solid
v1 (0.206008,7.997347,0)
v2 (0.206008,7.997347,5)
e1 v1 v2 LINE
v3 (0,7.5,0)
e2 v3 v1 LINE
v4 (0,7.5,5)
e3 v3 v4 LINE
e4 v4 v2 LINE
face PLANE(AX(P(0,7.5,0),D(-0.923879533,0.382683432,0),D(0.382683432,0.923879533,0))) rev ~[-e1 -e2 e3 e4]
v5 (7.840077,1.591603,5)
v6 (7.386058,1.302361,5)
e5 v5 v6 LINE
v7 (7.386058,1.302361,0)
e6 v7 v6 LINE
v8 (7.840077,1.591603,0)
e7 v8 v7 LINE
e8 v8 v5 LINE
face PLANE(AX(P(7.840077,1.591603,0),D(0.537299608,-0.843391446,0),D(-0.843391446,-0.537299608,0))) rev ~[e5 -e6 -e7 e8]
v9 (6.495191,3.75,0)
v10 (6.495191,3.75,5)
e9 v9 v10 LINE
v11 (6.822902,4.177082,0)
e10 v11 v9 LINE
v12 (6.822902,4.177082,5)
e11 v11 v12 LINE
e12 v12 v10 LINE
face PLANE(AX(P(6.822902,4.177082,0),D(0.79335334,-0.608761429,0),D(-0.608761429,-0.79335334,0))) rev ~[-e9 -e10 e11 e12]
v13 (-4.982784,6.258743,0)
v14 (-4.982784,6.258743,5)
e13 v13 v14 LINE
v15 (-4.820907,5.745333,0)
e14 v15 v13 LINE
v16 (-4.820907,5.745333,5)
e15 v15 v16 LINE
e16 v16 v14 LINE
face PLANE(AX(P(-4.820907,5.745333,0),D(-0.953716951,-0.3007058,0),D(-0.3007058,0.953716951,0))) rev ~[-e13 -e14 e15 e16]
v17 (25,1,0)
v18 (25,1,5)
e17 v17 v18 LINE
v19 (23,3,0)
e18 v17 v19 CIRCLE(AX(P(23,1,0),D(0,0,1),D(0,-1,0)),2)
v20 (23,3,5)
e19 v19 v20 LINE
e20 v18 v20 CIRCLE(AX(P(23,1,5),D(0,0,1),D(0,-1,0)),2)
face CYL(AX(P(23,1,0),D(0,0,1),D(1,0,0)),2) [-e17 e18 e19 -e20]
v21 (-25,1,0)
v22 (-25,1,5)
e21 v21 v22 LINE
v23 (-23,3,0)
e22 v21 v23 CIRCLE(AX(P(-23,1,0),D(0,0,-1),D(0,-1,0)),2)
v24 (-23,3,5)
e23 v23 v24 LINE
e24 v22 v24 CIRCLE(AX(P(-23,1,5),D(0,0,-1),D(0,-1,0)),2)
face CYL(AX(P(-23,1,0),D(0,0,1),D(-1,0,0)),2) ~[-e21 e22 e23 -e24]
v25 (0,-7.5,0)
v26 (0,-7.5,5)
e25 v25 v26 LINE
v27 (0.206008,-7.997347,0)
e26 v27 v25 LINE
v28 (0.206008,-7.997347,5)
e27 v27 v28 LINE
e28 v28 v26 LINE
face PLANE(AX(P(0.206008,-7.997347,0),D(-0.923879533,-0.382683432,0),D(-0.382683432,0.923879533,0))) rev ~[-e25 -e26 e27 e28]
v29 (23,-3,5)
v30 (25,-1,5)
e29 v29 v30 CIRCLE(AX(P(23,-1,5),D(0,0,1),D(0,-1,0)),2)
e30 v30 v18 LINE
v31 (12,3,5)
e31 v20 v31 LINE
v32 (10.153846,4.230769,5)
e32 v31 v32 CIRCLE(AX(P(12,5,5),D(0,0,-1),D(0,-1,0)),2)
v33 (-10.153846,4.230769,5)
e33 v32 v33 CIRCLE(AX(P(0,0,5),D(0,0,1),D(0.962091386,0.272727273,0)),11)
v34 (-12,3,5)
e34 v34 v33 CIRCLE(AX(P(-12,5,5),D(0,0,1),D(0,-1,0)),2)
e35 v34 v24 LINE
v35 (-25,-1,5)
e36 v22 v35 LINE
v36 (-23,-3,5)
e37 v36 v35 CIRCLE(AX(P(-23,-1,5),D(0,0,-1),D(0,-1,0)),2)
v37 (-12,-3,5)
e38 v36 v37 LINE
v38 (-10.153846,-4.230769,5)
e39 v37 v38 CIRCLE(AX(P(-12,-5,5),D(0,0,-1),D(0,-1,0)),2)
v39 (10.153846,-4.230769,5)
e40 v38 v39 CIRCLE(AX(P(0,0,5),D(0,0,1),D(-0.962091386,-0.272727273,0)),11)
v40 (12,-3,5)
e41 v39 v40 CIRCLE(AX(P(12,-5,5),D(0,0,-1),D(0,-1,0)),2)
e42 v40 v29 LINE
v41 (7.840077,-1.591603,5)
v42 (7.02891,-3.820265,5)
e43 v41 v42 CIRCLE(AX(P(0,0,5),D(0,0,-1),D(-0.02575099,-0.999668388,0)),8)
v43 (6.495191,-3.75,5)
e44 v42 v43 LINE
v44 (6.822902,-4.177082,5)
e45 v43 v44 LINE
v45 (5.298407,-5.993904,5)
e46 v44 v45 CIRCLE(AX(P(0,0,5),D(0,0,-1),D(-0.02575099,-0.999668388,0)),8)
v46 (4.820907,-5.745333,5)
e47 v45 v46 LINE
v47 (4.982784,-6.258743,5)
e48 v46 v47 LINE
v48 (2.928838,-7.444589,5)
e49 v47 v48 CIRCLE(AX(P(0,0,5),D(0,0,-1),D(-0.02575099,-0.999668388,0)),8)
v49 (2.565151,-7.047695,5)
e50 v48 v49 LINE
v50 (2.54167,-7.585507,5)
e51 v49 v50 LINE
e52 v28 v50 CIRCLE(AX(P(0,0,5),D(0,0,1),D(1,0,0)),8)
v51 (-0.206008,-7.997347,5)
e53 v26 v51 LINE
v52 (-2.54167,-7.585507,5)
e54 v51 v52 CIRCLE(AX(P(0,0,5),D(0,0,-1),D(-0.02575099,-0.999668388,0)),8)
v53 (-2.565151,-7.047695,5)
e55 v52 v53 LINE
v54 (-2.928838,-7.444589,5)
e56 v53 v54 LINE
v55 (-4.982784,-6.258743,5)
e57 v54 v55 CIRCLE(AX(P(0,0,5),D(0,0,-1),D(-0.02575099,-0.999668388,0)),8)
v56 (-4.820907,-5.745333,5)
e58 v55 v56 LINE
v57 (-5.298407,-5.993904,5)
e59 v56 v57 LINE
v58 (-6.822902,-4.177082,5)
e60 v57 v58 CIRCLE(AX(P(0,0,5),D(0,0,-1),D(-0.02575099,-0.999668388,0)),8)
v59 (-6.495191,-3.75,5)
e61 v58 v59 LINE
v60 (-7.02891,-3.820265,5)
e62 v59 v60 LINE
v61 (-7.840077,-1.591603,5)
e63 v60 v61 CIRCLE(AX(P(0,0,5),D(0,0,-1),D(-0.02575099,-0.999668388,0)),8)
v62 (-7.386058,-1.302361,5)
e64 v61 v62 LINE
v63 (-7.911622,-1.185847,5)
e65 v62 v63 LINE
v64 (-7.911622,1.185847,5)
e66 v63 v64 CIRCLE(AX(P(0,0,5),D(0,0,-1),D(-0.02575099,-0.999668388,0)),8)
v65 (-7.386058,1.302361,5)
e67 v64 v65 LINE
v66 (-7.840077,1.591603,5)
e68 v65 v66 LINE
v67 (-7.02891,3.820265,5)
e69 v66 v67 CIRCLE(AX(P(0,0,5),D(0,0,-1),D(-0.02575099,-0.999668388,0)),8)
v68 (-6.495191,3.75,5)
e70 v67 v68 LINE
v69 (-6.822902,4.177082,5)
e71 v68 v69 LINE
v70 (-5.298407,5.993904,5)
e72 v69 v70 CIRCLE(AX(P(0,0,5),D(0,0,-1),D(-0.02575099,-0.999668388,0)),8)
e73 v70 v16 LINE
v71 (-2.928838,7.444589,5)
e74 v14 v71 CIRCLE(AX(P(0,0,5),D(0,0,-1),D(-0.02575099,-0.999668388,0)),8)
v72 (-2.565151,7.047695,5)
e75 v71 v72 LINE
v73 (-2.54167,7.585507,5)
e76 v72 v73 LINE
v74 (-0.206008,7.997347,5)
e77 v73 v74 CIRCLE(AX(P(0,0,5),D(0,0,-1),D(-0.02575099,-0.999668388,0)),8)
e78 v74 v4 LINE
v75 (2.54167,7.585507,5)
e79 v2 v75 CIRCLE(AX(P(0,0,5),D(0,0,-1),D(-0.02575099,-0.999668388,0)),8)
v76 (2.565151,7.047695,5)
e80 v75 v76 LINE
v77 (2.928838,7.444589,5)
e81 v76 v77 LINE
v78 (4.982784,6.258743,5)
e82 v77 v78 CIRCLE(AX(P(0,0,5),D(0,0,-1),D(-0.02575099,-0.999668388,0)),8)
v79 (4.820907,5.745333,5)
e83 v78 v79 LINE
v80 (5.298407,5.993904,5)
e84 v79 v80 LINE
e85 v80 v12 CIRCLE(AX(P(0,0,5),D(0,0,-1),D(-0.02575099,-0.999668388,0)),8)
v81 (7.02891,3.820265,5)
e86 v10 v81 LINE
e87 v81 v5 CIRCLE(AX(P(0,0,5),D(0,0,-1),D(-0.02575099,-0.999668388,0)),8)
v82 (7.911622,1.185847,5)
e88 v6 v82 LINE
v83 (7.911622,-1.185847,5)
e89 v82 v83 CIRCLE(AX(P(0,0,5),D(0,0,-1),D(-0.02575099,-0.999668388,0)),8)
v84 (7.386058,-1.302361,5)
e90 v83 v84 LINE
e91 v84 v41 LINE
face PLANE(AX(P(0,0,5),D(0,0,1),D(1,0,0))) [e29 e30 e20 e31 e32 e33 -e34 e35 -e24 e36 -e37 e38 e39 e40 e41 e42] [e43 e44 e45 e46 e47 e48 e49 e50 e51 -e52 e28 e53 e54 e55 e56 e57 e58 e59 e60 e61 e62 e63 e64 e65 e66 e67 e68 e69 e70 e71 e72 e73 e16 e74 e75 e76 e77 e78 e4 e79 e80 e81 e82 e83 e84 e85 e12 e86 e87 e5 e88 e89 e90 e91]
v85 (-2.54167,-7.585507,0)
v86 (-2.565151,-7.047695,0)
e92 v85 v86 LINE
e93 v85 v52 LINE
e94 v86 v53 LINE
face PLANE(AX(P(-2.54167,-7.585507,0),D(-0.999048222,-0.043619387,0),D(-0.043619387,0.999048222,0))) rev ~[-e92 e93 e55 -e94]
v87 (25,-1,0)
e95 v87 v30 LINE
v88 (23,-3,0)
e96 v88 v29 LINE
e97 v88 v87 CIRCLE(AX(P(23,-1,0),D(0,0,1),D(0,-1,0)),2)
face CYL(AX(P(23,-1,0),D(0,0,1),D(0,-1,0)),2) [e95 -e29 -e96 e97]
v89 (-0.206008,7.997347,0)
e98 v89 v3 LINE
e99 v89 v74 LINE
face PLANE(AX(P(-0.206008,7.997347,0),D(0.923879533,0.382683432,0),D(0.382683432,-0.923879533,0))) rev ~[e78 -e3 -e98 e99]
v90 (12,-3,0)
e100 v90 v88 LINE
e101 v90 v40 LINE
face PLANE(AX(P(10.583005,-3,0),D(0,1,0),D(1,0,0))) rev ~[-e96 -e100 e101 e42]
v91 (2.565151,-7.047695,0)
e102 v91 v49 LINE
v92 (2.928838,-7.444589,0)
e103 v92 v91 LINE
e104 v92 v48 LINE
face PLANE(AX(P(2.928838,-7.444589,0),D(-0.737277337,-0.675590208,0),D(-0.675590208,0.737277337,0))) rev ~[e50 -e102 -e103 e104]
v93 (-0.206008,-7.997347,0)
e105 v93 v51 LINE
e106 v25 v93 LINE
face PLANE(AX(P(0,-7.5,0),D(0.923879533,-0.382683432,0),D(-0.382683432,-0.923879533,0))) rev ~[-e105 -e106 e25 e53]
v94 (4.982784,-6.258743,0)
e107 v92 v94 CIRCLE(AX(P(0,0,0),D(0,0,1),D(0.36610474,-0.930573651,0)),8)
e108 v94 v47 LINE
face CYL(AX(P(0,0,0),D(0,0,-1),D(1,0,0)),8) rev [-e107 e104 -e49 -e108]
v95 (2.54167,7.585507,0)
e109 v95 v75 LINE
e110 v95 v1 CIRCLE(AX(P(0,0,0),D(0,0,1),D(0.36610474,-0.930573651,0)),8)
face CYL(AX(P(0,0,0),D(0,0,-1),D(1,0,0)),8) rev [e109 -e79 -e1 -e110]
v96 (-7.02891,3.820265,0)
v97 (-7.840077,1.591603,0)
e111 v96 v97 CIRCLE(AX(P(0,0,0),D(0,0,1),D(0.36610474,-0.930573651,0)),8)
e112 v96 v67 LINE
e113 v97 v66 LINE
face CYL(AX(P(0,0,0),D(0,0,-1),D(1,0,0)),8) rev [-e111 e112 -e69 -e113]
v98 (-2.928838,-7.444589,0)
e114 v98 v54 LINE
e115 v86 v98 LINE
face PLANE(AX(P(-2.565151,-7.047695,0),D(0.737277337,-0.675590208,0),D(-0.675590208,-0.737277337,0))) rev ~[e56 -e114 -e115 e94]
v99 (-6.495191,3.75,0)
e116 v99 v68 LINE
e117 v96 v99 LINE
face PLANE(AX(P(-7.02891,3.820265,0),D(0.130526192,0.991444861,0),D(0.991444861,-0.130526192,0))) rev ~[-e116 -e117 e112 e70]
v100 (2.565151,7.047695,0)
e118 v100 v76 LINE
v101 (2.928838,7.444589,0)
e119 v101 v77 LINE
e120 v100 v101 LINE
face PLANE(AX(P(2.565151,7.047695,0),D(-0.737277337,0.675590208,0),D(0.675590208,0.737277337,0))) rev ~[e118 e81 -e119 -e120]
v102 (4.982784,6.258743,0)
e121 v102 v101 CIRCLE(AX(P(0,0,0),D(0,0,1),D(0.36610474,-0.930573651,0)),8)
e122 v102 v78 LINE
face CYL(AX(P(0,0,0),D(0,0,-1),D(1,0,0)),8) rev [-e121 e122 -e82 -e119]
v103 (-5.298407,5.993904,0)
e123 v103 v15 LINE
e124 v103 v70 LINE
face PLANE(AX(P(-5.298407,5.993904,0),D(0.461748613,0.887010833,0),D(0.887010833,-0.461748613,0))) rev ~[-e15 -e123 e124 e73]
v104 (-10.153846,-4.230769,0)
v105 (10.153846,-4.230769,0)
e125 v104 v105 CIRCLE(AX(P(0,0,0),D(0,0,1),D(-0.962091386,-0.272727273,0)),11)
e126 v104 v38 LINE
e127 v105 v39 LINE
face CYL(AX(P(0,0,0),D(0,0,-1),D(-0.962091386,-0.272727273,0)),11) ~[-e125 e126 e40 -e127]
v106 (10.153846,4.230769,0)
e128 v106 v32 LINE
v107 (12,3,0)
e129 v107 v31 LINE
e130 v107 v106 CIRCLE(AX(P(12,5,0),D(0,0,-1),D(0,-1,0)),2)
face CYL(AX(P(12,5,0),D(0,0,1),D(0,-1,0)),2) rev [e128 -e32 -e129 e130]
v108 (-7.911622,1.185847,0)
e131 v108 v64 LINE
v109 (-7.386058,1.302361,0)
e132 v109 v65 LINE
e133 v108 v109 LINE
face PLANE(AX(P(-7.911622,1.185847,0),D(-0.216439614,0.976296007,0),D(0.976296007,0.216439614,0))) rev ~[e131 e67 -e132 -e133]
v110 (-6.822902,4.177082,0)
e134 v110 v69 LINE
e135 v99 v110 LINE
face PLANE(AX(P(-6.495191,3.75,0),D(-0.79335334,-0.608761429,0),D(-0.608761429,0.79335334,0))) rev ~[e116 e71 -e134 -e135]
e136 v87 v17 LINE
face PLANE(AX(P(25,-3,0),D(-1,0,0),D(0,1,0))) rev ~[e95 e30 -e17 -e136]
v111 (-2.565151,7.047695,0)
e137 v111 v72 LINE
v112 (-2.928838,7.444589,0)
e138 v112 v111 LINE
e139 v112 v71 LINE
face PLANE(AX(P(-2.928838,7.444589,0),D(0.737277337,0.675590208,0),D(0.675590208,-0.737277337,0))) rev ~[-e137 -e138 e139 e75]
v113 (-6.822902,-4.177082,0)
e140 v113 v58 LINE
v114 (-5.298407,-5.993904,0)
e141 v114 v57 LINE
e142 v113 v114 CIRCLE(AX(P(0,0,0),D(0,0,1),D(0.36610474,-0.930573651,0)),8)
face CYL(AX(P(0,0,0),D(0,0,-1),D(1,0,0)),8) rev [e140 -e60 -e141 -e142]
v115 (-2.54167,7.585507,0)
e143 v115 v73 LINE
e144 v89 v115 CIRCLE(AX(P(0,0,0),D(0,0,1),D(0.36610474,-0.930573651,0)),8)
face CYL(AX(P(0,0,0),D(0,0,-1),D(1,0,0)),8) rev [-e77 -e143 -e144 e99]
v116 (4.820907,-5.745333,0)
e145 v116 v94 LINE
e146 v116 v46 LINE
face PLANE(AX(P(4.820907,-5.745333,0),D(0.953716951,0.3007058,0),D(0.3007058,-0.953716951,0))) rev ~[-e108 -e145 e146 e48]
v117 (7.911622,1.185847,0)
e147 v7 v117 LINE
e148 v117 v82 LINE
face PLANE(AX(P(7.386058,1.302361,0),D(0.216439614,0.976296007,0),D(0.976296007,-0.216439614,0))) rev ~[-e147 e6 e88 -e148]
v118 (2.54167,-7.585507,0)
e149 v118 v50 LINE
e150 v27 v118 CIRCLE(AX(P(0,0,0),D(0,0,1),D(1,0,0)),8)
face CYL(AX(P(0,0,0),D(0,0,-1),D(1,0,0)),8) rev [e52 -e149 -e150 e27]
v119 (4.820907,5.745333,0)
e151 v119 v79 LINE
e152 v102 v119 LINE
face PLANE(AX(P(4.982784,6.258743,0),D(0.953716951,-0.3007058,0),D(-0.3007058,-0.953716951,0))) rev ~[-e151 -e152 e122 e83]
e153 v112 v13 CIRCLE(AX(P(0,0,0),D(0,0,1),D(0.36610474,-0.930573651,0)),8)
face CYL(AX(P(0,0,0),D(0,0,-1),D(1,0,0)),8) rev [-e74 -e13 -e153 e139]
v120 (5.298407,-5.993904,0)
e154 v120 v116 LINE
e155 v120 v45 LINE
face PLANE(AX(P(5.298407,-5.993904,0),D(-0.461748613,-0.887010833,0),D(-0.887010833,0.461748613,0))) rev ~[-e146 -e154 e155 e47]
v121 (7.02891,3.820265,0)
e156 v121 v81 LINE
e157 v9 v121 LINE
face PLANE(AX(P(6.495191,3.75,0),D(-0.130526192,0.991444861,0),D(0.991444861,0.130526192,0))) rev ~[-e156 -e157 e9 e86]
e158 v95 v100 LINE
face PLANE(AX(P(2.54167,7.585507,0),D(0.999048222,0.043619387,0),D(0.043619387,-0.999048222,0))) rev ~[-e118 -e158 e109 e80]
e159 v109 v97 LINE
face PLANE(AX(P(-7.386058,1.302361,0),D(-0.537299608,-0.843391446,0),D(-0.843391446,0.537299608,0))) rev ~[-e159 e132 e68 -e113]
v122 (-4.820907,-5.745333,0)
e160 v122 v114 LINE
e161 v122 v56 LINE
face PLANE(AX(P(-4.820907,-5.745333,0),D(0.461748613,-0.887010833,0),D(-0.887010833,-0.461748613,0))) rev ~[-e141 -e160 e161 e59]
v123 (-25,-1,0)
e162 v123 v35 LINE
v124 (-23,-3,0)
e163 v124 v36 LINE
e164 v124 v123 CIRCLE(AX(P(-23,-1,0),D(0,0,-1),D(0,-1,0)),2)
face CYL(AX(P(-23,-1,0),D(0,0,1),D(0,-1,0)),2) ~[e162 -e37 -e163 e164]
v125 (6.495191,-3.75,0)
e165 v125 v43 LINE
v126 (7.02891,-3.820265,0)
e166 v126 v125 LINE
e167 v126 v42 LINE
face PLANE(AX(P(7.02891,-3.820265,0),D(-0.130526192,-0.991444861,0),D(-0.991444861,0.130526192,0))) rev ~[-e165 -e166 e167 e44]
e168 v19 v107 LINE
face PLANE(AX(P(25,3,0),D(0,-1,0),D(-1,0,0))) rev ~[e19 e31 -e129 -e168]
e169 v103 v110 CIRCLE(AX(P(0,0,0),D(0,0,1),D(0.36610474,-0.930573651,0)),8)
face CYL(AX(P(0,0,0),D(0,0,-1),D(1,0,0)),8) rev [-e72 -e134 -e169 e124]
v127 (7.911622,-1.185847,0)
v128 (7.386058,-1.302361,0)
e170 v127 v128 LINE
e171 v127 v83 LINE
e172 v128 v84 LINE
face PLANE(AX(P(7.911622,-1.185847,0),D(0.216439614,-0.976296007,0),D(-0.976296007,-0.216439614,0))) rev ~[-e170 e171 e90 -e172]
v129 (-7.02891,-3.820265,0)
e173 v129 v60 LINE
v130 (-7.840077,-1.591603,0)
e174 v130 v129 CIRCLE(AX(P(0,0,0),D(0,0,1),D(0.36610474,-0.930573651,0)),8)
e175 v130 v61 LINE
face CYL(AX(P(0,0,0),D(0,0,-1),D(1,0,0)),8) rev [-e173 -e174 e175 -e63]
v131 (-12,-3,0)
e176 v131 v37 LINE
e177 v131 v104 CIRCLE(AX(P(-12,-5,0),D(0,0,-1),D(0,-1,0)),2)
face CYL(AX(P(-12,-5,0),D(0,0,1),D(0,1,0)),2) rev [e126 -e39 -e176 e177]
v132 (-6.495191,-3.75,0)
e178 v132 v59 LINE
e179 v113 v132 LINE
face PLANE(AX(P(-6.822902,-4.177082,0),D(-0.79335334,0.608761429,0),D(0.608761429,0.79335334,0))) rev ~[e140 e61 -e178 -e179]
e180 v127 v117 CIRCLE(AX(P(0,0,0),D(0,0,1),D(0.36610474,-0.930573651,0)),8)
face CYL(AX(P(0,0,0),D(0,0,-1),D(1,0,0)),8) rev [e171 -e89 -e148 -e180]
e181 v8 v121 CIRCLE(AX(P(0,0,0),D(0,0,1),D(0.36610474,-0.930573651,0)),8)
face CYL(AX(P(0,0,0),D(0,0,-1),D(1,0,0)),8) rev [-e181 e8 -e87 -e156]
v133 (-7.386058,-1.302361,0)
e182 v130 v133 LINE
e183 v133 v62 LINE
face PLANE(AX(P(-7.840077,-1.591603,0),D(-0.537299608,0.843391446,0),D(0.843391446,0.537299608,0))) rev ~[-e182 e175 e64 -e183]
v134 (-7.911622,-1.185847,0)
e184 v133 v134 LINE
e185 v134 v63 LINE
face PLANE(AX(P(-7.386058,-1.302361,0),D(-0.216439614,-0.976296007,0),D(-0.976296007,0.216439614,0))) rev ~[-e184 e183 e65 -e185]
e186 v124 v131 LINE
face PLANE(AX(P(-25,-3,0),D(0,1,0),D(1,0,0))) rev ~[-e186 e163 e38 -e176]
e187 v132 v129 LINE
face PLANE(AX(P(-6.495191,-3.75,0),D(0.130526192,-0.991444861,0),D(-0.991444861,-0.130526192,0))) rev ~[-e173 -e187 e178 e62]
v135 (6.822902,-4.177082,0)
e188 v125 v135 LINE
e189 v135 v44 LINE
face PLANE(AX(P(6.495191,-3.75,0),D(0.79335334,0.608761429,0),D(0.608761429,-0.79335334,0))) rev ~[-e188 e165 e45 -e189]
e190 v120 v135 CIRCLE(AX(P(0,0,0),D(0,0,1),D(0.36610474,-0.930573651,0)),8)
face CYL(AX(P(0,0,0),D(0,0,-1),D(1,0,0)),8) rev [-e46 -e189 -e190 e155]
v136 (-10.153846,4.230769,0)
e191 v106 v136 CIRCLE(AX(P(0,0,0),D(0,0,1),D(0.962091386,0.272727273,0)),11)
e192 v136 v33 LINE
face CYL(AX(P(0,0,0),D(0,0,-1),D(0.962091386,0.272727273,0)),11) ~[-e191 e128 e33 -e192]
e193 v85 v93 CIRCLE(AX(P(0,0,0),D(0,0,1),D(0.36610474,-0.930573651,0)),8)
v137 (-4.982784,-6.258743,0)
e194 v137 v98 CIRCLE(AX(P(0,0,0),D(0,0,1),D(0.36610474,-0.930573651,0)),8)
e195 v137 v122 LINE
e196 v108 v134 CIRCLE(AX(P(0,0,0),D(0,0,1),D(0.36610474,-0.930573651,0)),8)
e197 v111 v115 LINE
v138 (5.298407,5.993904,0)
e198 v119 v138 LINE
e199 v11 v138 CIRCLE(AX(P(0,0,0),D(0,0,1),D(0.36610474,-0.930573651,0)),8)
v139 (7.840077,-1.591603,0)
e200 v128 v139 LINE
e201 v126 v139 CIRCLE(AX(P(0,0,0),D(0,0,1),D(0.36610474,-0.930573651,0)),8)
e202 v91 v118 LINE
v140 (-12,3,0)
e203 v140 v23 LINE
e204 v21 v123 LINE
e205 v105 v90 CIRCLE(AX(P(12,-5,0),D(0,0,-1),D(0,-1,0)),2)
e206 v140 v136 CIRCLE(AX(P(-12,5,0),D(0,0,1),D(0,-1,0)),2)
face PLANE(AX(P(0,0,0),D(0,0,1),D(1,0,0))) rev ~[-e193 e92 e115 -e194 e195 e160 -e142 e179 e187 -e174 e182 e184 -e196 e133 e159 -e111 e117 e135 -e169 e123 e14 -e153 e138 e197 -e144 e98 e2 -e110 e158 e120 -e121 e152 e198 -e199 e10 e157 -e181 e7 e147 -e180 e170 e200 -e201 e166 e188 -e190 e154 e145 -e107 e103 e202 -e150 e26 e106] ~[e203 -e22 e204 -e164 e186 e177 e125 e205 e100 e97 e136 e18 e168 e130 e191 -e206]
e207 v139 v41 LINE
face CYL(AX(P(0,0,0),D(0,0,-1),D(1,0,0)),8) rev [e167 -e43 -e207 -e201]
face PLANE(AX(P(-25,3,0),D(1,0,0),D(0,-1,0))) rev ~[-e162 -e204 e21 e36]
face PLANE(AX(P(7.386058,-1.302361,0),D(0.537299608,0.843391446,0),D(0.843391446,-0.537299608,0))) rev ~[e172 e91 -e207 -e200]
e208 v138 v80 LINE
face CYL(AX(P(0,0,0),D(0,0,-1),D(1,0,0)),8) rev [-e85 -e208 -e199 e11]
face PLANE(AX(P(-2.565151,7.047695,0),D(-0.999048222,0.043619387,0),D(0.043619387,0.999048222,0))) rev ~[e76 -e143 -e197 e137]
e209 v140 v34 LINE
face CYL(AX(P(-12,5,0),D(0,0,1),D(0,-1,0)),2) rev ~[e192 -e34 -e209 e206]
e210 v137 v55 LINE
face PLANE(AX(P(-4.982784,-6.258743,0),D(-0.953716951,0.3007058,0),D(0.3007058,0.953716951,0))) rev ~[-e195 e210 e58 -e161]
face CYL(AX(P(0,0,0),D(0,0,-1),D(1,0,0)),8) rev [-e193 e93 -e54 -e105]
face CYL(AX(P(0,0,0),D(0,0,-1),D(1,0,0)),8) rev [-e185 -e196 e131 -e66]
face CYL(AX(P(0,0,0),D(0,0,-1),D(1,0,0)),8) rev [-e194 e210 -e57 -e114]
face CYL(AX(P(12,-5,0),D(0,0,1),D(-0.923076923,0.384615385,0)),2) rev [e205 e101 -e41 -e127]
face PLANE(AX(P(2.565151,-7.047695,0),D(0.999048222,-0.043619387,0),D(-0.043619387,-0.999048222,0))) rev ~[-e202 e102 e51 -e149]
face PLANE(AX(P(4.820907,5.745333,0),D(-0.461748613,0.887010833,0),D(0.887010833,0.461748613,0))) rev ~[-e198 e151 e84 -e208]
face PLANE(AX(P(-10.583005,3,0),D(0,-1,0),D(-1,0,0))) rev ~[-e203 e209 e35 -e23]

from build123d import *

# Parameters (mm, degrees)
F0_R            = 8
F1_DEPTH        = 5
F3_DEPTH        = 5
F3_COPIES_COUNT = 18
F4_R            = 2


# Not quite as in the source:
# - a pattern or mirror of a feature is missing from the dataset's text; its kind, count and spacing are read off the source's solid


with BuildPart() as f1:
    # F0 (on Top) → F1 (new body)
    with BuildSketch(Plane.XY):
        with BuildLine():
            Line((-25, -3), (-10.5830052443, -3))
            ThreePointArc((-10.5830052443, -3), (0, -11), (10.5830052443, -3))
            Line((10.5830052443, -3), (25, -3))
            Line((25, -3), (25, 3))
            Line((25, 3), (10.5830052443, 3))
            ThreePointArc((10.5830052443, 3), (0, 11), (-10.5830052443, 3))
            Line((-10.5830052443, 3), (-25, 3))
            Line((-25, 3), (-25, -3))
        make_face()
        Circle(F0_R, mode=Mode.SUBTRACT)
    extrude(amount=F1_DEPTH)

    # F2 (on Top) → F3 (join)
    with BuildSketch(Plane.XY):
        with BuildLine():
            Line((0, -7.5), (-0.2060079166, -7.9973471063))
            ThreePointArc((-0.2060079166, -7.9973471063), (0, -8), (0.2060079166, -7.9973471063))
            Line((0.2060079166, -7.9973471063), (0, -7.5))
        make_face()
    f3 = extrude(amount=F3_DEPTH)

    # F3_copies: F3 ×18 about axis
    f3_copies_axis = Axis((0, 0, 0), (0, 0, 1))
    for i in range(1, F3_COPIES_COUNT):
        add(f3.rotate(f3_copies_axis, i * 360 / F3_COPIES_COUNT))

    # F4
    f4_edges = [f1.edges().sort_by_distance(p)[0] for p in [
        (-25, 3, 2.5),
        (-25, -3, 2.5),
        (25, 3, 2.5),
        (-10.583005, 3, 2.5),
        (25, -3, 2.5),
        (10.583005, -3, 2.5),
        (-10.583005, -3, 2.5),
        (10.583005, 3, 2.5),
    ]]
    fillet(f4_edges, radius=F4_R)


solid = f1.part
